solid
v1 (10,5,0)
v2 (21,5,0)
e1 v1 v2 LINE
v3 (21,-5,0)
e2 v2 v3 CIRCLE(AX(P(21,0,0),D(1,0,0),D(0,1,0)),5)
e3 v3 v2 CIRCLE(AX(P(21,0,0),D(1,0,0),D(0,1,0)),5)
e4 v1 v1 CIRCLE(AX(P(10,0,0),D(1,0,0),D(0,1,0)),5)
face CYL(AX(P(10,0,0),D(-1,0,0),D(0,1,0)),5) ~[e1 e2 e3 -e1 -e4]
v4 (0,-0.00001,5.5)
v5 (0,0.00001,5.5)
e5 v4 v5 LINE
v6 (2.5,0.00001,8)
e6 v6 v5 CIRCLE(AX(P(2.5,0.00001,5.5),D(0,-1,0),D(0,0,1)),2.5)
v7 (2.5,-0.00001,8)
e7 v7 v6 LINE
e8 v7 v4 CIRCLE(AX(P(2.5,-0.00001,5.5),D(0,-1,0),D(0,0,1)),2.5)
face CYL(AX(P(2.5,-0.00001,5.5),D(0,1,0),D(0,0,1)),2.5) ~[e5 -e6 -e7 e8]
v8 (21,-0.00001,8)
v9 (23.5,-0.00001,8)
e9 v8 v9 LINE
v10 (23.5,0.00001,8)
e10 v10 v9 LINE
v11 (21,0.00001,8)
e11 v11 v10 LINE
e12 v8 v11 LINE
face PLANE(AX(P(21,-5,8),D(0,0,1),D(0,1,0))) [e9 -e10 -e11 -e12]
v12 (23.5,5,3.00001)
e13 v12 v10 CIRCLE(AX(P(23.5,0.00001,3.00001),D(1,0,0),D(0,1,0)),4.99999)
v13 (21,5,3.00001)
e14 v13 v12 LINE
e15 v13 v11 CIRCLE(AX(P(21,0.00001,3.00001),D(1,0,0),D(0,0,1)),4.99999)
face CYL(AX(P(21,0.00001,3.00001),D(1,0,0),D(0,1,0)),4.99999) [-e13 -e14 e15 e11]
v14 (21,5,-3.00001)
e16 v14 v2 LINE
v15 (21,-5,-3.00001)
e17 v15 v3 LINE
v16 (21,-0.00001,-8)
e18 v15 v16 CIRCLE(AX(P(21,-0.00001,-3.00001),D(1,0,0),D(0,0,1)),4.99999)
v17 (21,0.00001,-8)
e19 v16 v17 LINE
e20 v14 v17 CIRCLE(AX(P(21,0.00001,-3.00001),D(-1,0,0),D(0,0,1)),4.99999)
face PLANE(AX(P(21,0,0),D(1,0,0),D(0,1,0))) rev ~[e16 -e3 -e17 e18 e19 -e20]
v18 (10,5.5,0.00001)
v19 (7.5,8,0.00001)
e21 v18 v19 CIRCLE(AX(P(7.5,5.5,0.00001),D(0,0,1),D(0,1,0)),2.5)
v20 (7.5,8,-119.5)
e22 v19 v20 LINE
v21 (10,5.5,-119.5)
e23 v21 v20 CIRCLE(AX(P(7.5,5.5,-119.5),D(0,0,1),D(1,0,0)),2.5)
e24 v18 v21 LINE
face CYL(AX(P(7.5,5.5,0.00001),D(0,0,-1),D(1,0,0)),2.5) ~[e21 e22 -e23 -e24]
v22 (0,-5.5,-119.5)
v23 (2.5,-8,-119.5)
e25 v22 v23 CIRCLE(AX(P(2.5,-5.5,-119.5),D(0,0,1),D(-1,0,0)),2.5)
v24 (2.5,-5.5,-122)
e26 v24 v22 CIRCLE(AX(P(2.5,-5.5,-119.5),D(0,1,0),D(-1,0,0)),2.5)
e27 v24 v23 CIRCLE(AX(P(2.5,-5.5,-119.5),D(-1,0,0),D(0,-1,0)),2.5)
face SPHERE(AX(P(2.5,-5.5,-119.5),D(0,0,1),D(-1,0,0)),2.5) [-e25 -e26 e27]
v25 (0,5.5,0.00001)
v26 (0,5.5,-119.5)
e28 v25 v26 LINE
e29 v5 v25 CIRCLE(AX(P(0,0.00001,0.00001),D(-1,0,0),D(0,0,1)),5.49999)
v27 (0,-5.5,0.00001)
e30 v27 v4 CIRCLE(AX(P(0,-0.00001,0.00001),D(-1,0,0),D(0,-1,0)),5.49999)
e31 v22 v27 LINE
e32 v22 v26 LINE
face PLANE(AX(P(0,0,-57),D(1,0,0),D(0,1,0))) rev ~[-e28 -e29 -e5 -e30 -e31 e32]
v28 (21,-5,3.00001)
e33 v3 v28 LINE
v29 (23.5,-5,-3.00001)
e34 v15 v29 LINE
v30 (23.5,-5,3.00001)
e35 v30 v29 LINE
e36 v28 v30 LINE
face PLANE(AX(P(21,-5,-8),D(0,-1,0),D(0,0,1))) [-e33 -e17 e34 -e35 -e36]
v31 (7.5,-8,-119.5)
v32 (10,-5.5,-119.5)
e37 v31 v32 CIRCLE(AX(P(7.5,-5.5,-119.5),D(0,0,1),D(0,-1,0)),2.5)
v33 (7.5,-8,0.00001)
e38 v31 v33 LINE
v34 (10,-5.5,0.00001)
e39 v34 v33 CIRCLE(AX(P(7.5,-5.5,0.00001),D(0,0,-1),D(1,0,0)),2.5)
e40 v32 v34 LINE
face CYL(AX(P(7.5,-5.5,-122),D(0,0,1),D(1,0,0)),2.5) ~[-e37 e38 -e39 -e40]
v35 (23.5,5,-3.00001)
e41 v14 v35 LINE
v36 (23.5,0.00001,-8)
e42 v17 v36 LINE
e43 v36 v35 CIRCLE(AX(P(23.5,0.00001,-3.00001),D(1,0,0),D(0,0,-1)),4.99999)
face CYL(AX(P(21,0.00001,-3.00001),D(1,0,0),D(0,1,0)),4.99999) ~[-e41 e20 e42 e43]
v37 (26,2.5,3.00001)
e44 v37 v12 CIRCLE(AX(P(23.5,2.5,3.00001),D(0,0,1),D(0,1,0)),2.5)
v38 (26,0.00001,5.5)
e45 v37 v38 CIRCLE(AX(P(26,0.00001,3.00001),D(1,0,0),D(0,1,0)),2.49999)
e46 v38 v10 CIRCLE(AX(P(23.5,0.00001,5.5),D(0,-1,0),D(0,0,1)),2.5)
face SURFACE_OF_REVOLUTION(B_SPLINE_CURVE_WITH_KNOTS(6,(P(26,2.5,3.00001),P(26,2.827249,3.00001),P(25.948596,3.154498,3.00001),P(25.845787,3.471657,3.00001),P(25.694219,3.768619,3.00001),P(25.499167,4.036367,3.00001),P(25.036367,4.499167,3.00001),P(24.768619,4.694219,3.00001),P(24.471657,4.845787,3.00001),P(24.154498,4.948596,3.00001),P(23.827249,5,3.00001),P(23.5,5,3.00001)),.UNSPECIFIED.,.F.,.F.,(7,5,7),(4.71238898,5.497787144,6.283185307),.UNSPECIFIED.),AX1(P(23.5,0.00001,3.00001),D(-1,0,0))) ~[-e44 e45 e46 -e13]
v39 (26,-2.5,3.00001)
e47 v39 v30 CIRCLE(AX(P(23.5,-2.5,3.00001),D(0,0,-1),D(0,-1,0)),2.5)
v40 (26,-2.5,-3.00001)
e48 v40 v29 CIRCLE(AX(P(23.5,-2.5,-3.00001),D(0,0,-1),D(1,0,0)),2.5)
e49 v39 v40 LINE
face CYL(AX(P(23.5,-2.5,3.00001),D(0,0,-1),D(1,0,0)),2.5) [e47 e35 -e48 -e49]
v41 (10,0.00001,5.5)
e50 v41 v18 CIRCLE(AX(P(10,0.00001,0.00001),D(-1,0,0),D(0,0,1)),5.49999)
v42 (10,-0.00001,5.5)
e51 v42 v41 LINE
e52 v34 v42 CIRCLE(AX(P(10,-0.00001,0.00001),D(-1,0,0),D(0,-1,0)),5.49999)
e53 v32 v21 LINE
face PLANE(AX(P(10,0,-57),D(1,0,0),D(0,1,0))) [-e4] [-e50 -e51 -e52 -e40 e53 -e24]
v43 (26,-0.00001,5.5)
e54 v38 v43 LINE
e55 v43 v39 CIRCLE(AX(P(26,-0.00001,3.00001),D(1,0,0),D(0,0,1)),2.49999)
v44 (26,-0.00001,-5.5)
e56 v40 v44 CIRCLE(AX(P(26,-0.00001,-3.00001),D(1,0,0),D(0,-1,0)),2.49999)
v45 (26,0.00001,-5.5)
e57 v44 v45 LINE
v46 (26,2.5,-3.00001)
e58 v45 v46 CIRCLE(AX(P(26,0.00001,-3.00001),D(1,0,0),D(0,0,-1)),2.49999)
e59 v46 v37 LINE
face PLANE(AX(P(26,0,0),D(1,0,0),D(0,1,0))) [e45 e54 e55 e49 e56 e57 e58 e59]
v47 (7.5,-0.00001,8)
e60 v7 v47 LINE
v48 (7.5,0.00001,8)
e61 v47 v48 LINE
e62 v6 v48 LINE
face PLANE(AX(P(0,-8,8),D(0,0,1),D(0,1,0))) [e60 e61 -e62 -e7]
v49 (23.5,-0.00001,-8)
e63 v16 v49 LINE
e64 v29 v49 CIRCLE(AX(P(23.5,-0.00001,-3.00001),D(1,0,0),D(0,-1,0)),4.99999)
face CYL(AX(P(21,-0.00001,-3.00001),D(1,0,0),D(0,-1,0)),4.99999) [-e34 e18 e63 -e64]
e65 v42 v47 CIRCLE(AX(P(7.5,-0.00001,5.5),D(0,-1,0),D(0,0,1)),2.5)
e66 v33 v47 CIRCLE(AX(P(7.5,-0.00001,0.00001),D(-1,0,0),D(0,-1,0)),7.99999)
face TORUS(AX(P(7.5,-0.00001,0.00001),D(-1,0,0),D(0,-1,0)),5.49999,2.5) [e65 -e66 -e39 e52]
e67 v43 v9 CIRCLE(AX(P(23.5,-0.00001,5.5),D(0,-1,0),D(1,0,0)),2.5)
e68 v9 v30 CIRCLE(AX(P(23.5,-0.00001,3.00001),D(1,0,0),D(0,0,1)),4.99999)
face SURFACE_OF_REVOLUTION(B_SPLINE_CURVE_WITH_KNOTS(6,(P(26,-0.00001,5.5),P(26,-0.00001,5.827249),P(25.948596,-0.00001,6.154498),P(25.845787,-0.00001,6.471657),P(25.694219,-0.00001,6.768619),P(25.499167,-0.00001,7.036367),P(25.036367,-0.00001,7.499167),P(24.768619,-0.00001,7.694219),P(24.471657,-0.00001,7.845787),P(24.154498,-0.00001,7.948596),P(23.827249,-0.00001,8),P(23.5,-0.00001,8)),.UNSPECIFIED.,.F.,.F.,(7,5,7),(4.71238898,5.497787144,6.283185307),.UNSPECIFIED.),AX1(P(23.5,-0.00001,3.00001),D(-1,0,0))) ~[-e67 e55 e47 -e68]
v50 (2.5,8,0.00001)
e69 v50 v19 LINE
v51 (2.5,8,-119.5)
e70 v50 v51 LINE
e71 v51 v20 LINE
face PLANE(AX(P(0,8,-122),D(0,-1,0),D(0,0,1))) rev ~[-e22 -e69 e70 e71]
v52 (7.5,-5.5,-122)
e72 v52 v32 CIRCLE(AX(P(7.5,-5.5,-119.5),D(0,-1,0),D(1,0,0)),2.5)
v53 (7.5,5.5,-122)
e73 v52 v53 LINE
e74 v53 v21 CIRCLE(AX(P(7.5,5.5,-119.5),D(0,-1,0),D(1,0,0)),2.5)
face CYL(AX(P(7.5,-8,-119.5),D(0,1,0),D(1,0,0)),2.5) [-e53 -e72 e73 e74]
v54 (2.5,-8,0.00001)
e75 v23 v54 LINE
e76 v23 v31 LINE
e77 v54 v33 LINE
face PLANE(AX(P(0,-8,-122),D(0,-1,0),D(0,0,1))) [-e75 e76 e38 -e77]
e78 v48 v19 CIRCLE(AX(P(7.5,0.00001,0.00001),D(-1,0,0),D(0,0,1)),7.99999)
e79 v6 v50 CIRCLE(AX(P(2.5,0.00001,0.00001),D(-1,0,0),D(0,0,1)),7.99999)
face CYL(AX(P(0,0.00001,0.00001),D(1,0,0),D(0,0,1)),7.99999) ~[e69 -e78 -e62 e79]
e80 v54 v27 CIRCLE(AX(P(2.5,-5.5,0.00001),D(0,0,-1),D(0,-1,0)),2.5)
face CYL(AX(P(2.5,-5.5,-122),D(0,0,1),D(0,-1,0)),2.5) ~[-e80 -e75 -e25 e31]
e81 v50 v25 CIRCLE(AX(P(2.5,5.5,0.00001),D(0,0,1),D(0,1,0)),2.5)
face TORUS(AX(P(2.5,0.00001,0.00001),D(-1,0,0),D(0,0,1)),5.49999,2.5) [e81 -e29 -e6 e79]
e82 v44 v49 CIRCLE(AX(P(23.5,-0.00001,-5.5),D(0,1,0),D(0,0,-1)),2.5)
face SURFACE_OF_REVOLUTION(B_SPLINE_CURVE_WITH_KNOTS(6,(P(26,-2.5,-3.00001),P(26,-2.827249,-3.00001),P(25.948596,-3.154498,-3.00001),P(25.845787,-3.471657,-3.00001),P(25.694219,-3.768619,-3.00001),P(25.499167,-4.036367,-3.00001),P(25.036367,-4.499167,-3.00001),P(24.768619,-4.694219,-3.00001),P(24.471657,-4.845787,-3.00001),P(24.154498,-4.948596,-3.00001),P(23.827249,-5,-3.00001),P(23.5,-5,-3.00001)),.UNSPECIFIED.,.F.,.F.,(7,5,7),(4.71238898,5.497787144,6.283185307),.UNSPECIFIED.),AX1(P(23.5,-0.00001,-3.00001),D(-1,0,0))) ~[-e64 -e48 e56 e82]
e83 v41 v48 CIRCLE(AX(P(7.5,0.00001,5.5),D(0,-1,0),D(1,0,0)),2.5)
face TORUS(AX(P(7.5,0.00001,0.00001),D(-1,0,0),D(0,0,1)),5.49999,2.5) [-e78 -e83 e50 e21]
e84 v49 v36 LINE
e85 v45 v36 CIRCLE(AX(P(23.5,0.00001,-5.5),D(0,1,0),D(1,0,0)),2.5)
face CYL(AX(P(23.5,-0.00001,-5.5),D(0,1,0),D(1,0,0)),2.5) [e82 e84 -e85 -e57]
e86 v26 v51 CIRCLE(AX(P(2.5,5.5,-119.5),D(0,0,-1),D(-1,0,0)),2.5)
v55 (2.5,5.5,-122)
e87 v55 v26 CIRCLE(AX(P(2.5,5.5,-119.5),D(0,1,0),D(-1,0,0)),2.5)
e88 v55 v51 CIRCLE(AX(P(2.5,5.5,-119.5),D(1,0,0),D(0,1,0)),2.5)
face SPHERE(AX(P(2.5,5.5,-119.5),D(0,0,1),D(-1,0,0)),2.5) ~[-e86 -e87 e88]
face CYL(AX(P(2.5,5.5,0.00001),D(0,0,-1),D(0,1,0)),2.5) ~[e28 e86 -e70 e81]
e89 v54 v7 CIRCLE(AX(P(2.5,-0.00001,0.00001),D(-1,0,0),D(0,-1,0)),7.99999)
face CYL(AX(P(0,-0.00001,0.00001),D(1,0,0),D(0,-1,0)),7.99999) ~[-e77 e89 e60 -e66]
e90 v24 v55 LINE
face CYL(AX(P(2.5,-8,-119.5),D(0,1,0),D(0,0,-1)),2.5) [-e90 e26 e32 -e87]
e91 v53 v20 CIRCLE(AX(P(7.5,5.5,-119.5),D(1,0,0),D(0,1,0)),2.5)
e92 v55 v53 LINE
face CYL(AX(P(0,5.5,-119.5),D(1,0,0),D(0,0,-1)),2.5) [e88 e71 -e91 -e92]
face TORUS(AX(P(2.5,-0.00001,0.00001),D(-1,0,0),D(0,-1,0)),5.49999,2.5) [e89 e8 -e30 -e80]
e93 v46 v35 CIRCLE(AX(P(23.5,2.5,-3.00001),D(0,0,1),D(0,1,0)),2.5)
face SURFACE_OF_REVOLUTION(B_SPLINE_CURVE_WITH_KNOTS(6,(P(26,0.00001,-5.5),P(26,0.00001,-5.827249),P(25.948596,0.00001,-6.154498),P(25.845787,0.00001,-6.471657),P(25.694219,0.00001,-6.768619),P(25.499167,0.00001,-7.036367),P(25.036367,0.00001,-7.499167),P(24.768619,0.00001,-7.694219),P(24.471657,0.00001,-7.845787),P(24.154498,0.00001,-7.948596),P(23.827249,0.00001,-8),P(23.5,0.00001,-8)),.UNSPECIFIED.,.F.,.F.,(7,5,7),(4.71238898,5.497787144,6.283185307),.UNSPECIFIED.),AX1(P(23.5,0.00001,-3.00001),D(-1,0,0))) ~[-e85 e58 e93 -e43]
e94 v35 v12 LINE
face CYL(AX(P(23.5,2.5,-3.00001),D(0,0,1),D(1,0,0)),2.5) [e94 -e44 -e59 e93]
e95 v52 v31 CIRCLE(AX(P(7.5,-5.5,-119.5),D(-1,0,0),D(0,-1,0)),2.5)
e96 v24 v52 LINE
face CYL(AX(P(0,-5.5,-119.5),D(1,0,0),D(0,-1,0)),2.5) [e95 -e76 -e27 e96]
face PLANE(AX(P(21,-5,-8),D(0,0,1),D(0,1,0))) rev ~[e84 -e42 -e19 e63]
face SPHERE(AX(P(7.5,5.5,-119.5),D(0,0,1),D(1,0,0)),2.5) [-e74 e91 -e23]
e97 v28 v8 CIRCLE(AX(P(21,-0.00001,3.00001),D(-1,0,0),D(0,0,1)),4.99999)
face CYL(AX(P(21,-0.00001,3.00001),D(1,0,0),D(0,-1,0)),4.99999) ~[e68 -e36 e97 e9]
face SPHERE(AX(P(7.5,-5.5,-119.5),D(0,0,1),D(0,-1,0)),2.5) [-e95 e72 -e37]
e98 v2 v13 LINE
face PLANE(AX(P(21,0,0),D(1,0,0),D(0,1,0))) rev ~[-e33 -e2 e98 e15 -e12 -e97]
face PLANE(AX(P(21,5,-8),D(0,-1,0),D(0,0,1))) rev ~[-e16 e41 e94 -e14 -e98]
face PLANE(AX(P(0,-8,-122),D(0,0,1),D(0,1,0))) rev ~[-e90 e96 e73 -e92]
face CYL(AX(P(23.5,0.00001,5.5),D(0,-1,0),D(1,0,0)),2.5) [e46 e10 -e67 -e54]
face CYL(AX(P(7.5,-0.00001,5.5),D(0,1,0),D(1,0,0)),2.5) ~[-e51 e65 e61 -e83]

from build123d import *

# Parameters (mm, degrees)
F0_W     = 16
F0_H     = 130
F1_DEPTH = 10
F2_R     = 5
F3_DEPTH = 11
F4_W     = 10
F4_H     = 16
F5_DEPTH = 5
F6_R     = 7.99999
F7_R     = 4.99999
F8_R     = 2.5


# Not quite as in the source:
# - a fillet or chamfer is up to 0.001 mm smaller than in the source, because OpenCascade refuses the exact size


with BuildPart() as f1:
    # F0 (on Right) → F1 (new body)
    with BuildSketch(Plane.YZ):
        with Locations((0, -57)):
            Rectangle(F0_W, F0_H)
    extrude(amount=F1_DEPTH)

    # F2 (on face) → F3 (join)
    with BuildSketch(Plane.YZ.offset(10)):
        Circle(F2_R)
    extrude(amount=F3_DEPTH)

    # F4 (on face) → F5 (join)
    with BuildSketch(Plane.YZ.offset(21)):
        Rectangle(F4_W, F4_H)
    extrude(amount=F5_DEPTH)

    # F6 (radius 8 in the source; OpenCascade refuses exactly that, so slightly less here)
    f6_edges = [f1.edges().sort_by_distance(p)[0] for p in [
        (5, -8, 8),
        (5, 8, 8),
    ]]
    fillet(f6_edges, radius=F6_R)

    # F7 (radius 5 in the source; OpenCascade refuses exactly that, so slightly less here)
    f7_edges = [f1.edges().sort_by_distance(p)[0] for p in [
        (23.5, -5, 8),
        (23.5, 5, 8),
        (23.5, -5, -8),
        (23.5, 5, -8),
    ]]
    fillet(f7_edges, radius=F7_R)

    # F8
    f8_edges = [f1.edges().sort_by_distance(p)[0] for p in [
        (26, 3.535537, 6.535537),
        (10, -5.656857, 5.656857),
        (0, -5.656857, 5.656857),
        (0, 0, -122),
        (5, -8, -122),
        (10, 0, -122),
        (5, 8, -122),
    ]]
    fillet(f8_edges, radius=F8_R)


solid = f1.part
